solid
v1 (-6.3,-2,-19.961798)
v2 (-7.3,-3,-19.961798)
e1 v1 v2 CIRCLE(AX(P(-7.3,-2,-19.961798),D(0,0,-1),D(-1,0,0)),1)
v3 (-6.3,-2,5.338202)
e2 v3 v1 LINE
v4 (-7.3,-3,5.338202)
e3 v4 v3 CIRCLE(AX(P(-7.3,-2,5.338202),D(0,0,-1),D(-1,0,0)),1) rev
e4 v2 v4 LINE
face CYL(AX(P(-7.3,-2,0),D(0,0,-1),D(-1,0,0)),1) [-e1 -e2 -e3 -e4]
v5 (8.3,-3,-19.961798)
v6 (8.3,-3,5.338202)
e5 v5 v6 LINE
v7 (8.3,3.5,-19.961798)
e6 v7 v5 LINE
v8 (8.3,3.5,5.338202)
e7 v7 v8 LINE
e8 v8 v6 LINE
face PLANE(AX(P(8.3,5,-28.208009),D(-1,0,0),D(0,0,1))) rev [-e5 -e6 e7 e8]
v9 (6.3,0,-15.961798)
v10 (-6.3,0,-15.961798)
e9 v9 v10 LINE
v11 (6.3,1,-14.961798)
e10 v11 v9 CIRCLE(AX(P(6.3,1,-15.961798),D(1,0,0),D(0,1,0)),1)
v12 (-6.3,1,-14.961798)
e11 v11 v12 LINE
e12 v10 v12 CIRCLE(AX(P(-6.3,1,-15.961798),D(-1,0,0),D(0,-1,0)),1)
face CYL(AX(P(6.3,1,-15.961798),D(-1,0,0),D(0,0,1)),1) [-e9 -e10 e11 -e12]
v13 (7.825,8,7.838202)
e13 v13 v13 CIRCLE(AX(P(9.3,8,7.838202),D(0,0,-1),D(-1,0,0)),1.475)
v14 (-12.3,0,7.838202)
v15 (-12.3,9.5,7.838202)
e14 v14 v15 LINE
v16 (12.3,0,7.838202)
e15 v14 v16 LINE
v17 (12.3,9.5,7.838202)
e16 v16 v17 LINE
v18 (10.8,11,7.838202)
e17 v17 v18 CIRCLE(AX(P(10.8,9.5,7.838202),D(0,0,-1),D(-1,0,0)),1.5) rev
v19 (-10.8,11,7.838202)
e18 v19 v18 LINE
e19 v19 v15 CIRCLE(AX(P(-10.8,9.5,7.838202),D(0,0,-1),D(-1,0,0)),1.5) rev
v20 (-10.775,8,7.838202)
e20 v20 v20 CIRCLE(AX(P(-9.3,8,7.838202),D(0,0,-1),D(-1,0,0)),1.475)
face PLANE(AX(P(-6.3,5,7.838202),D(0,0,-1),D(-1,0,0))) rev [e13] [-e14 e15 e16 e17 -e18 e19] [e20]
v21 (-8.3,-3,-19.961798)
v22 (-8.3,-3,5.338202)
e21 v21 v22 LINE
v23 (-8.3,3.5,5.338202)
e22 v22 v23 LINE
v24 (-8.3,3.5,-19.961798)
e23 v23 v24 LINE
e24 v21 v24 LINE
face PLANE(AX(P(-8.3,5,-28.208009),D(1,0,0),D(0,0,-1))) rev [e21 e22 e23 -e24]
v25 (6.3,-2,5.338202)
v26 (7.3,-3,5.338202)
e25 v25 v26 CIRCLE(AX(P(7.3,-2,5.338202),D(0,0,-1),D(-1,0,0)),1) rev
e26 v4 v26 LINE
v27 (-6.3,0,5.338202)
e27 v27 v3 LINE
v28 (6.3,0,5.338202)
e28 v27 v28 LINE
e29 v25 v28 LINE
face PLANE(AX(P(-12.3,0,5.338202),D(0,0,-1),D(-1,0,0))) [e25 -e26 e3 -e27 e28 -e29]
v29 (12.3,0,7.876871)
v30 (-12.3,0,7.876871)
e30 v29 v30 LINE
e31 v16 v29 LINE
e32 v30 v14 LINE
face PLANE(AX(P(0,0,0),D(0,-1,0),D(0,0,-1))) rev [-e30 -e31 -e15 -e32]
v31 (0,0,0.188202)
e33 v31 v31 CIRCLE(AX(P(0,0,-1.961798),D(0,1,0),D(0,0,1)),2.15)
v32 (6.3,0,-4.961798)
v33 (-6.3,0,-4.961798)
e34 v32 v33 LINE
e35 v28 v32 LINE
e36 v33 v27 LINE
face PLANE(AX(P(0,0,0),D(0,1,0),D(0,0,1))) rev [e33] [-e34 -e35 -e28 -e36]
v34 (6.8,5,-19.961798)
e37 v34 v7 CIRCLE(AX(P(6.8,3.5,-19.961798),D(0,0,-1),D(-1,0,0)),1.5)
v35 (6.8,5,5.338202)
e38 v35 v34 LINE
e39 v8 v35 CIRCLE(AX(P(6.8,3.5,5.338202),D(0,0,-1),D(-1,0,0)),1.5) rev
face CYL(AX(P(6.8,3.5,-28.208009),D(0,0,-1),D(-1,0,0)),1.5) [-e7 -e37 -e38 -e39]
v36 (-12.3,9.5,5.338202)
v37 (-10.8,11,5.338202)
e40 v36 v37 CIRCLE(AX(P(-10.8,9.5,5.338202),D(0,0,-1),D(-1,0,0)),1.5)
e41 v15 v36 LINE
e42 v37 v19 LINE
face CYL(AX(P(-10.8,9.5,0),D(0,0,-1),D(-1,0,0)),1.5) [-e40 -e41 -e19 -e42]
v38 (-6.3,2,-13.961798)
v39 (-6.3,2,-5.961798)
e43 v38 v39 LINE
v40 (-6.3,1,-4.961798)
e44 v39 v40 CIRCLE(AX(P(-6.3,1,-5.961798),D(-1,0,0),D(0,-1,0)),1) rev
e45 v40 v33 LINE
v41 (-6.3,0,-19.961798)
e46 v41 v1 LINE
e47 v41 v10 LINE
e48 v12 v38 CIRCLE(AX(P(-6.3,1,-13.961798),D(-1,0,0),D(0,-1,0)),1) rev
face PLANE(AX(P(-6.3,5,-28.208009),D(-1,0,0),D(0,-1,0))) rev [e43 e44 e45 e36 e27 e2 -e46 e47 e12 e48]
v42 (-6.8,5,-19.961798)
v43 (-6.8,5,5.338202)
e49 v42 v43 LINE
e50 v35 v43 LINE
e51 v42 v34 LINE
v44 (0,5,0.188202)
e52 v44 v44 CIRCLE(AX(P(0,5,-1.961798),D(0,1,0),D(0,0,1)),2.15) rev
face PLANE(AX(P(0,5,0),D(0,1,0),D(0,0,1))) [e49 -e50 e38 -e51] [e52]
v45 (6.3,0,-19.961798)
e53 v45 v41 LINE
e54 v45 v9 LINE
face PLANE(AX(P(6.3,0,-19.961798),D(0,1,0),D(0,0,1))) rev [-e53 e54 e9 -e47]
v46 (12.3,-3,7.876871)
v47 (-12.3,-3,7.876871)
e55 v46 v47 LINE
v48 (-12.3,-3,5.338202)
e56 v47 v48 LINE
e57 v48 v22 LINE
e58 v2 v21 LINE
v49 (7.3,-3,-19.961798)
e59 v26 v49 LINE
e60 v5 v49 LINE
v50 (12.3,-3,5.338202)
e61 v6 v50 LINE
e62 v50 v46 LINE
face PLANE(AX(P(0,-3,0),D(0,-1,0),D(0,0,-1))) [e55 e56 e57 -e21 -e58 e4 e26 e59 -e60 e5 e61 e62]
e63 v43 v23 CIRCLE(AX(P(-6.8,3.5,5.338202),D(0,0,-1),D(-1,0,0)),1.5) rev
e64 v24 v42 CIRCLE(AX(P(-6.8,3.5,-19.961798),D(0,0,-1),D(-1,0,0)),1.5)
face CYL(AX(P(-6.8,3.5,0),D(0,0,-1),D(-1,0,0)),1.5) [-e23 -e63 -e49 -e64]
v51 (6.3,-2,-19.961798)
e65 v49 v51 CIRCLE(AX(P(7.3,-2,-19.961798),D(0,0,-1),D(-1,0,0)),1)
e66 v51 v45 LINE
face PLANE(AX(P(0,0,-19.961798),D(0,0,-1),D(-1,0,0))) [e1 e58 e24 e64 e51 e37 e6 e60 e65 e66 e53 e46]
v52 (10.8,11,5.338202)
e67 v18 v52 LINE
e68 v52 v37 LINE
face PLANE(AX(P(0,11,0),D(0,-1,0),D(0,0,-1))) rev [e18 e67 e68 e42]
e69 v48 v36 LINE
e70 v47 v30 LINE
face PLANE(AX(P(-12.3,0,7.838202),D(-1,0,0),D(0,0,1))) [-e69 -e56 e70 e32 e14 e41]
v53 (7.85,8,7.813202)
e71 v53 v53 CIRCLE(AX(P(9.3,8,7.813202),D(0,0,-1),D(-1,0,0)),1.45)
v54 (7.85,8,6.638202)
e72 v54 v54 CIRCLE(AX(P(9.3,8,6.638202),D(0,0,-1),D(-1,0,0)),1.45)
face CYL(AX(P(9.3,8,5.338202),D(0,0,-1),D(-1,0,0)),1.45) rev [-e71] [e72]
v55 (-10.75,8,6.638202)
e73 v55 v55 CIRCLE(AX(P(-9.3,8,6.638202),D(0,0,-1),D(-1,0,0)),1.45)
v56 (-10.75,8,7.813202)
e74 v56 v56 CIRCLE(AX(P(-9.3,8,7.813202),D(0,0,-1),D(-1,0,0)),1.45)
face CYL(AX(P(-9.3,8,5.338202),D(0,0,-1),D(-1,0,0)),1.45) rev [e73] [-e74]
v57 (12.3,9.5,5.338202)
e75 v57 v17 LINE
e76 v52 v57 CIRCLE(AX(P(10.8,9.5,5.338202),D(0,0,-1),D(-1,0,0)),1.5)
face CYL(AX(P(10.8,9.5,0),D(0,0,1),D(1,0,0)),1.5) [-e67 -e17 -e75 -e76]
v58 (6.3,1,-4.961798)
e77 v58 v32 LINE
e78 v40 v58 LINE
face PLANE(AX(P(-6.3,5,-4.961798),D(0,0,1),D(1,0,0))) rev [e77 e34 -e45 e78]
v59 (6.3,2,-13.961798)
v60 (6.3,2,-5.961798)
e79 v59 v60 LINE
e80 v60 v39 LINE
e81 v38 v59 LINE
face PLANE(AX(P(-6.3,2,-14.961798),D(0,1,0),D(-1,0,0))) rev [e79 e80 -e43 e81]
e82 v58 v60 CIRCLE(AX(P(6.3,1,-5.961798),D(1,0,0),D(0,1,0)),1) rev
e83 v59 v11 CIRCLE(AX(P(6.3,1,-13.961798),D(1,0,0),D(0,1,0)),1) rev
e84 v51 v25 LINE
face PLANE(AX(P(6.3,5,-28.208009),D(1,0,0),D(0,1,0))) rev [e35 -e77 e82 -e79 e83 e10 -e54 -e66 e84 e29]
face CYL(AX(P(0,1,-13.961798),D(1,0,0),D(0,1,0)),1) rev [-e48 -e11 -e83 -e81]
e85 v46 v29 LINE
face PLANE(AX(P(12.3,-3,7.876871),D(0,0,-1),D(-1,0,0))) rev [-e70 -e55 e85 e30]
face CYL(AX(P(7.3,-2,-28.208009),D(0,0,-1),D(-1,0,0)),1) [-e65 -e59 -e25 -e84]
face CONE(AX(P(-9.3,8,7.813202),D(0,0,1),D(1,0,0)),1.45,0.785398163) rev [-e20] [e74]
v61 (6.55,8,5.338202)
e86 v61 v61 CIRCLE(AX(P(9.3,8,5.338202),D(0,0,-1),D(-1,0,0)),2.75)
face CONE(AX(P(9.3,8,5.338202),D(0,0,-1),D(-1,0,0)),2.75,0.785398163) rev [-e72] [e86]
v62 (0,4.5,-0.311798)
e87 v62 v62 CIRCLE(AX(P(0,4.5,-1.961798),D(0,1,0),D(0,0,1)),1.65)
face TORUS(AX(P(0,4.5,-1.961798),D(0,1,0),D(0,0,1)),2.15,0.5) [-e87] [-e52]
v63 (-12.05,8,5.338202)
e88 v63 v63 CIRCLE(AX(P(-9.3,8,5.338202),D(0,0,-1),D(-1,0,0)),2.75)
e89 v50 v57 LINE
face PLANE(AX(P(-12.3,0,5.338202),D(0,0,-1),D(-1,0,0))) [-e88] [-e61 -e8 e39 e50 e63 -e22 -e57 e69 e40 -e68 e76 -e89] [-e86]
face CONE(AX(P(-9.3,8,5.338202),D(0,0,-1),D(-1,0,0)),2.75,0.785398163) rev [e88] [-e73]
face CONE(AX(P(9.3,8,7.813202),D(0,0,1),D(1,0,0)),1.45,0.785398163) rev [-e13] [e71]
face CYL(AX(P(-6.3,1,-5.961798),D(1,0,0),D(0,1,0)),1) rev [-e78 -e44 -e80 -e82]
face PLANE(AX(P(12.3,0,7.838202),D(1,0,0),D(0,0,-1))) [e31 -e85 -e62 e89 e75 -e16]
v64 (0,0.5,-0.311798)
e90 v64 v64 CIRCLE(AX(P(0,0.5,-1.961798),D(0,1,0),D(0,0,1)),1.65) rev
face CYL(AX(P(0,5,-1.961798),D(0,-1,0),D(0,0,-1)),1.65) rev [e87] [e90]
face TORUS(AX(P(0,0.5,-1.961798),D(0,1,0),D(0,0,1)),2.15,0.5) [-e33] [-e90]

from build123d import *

# Parameters (mm, degrees)
ESQUISSE1_W                                  = 12.6
ESQUISSE1_H                                  = 12.8
ESQUISSE1_R                                  = 1.65
BOSS_EXTRU_1_DEPTH                           = 5
BOSS_EXTRU_3_DEPTH                           = 6
BOSS_EXTRU_3_DEPTH_BACK                      = 5
ESQUISSE2_W                                  = 24.6
ESQUISSE2_H                                  = 2.5
FRAISAGE_POUR_VIS_T_TE_FRAIS_E_M2_51_A_COUNT = 2
FRAISAGE_POUR_VIS_T_TE_FRAIS_E_M2_51_A_PITCH = 18.6
CONG_3_R                                     = 0.5
ESQUISSE6_W                                  = 12.6
ESQUISSE6_H                                  = 3
BOSS_EXTRU_4_DEPTH                           = 10
ESQUISSE7_W                                  = 12.6
ESQUISSE7_H                                  = 5
BOSS_EXTRU_5_DEPTH                           = 5
ESQUISSE9_W                                  = 24.6
ESQUISSE9_H                                  = 2.538668555
BOSS_EXTRU_6_DEPTH                           = 3
ESQUISSE11_W                                 = 2
ESQUISSE11_H                                 = 8
BOSS_EXTRU_7_DEPTH                           = 25.3
CONG_4_R                                     = 1
CONG_5_R                                     = 1
CONG_6_R                                     = 1.5
CONG_7_R                                     = 1.5


with BuildPart() as part:
    # Esquisse1 → Boss.-Extru.1 (new body)
    with BuildSketch(Plane(origin=(0, 0, 0), x_dir=(1, 0, 0), z_dir=(0, 1, 0))):
        with Locations((0, -1.438202247)):
            Rectangle(ESQUISSE1_W, ESQUISSE1_H)
        with Locations(Location((0, 1.961797753, 0), (0, 0, 270))):
            Circle(ESQUISSE1_R, mode=Mode.SUBTRACT)
    extrude(amount=BOSS_EXTRU_1_DEPTH)

    # Esquisse2 → Boss.-Extru.3 (add, two sides: drawn at the far end of the back side and taken through both)
    with BuildSketch(Plane(origin=(0, 5, 0), x_dir=(1, 0, 0), z_dir=(0, 1, 0)).offset(-BOSS_EXTRU_3_DEPTH_BACK)):
        with Locations((0, -6.588202247)):
            Rectangle(ESQUISSE2_W, ESQUISSE2_H)
    extrude(amount=BOSS_EXTRU_3_DEPTH + BOSS_EXTRU_3_DEPTH_BACK)

    # Esquisse5 → Fraisage pour vis à tête fraisée M2.51 (revolve, cut)
    with BuildSketch(Plane(origin=(-9.3, 8, 5.338202247), x_dir=(0, 1, 0), z_dir=(1, 0, 0))):
        Polygon((0, 0), (0, 2.5), (1.475, 2.5), (1.45, 2.475), (1.45, 1.3), (2.75, 0), align=None)
    fraisage_pour_vis_t_te_frais_e_m2_51 = revolve(axis=Axis((-9.3, 8, -1.011797753), (0, 0, 1)), mode=Mode.SUBTRACT)

    # Fraisage pour vis à tête fraisée M2.51 a: Fraisage pour vis à tête fraisée M2.51 ×2
    with Locations(*[(i * FRAISAGE_POUR_VIS_T_TE_FRAIS_E_M2_51_A_PITCH, 0, 0) for i in range(1, FRAISAGE_POUR_VIS_T_TE_FRAIS_E_M2_51_A_COUNT)]):
        add(fraisage_pour_vis_t_te_frais_e_m2_51, mode=Mode.SUBTRACT)

    # Congé3
    cong_3_edges = [part.edges().sort_by_distance(p)[0] for p in [
        (0, 0, -3.611797753),
        (0, 5, -3.611797753),
    ]]
    fillet(cong_3_edges, radius=CONG_3_R)

    # Esquisse6 → Boss.-Extru.4 (add)
    with BuildSketch(Plane(origin=(0, 0, -4.961797753), x_dir=(-1, 0, 0), z_dir=(0, 0, -1))):
        with Locations((0, 3.5)):
            Rectangle(ESQUISSE6_W, ESQUISSE6_H)
    extrude(amount=BOSS_EXTRU_4_DEPTH)

    # Esquisse7 → Boss.-Extru.5 (add)
    with BuildSketch(Plane(origin=(0, 0, -14.961797753), x_dir=(-1, 0, 0), z_dir=(0, 0, -1))):
        with Locations((0, 2.5)):
            Rectangle(ESQUISSE7_W, ESQUISSE7_H)
    extrude(amount=BOSS_EXTRU_5_DEPTH)

    # Esquisse9 → Boss.-Extru.6 (add)
    with BuildSketch(Plane.XZ):
        with Locations((0, 6.607536525)):
            Rectangle(ESQUISSE9_W, ESQUISSE9_H)
    extrude(amount=BOSS_EXTRU_6_DEPTH)

    # Esquisse11 → Boss.-Extru.7 (add)
    with BuildSketch(Plane(origin=(0, 0, 5.338202247), x_dir=(-1, 0, 0), z_dir=(0, 0, -1))):
        with Locations((-7.3, 1)):
            Rectangle(ESQUISSE11_W, ESQUISSE11_H)
        with Locations((7.3, 1)):
            Rectangle(ESQUISSE11_W, ESQUISSE11_H)
    extrude(amount=BOSS_EXTRU_7_DEPTH)

    # Congé4
    cong_4_edges = [part.edges().sort_by_distance(p)[0] for p in [
        (0, 0, -14.961797753),
        (0, 2, -14.961797753),
        (0, 2, -4.961797753),
    ]]
    fillet(cong_4_edges, radius=CONG_4_R - 0.0001)  # a hair under: the kernel refuses the full size

    # Congé5
    cong_5_edges = [part.edges().sort_by_distance(p)[0] for p in [
        (6.3, -3, -7.311797753),
        (-6.3, -3, -7.311797753),
    ]]
    fillet(cong_5_edges, radius=CONG_5_R)

    # Congé6
    cong_6_edges = [part.edges().sort_by_distance(p)[0] for p in [
        (8.3, 5, -7.311797753),
        (-8.3, 5, -7.311797753),
    ]]
    fillet(cong_6_edges, radius=CONG_6_R)

    # Congé7
    cong_7_edges = [part.edges().sort_by_distance(p)[0] for p in [
        (-12.3, 11, 6.588202247),
        (12.3, 11, 6.588202247),
    ]]
    fillet(cong_7_edges, radius=CONG_7_R)


solid = part.part
